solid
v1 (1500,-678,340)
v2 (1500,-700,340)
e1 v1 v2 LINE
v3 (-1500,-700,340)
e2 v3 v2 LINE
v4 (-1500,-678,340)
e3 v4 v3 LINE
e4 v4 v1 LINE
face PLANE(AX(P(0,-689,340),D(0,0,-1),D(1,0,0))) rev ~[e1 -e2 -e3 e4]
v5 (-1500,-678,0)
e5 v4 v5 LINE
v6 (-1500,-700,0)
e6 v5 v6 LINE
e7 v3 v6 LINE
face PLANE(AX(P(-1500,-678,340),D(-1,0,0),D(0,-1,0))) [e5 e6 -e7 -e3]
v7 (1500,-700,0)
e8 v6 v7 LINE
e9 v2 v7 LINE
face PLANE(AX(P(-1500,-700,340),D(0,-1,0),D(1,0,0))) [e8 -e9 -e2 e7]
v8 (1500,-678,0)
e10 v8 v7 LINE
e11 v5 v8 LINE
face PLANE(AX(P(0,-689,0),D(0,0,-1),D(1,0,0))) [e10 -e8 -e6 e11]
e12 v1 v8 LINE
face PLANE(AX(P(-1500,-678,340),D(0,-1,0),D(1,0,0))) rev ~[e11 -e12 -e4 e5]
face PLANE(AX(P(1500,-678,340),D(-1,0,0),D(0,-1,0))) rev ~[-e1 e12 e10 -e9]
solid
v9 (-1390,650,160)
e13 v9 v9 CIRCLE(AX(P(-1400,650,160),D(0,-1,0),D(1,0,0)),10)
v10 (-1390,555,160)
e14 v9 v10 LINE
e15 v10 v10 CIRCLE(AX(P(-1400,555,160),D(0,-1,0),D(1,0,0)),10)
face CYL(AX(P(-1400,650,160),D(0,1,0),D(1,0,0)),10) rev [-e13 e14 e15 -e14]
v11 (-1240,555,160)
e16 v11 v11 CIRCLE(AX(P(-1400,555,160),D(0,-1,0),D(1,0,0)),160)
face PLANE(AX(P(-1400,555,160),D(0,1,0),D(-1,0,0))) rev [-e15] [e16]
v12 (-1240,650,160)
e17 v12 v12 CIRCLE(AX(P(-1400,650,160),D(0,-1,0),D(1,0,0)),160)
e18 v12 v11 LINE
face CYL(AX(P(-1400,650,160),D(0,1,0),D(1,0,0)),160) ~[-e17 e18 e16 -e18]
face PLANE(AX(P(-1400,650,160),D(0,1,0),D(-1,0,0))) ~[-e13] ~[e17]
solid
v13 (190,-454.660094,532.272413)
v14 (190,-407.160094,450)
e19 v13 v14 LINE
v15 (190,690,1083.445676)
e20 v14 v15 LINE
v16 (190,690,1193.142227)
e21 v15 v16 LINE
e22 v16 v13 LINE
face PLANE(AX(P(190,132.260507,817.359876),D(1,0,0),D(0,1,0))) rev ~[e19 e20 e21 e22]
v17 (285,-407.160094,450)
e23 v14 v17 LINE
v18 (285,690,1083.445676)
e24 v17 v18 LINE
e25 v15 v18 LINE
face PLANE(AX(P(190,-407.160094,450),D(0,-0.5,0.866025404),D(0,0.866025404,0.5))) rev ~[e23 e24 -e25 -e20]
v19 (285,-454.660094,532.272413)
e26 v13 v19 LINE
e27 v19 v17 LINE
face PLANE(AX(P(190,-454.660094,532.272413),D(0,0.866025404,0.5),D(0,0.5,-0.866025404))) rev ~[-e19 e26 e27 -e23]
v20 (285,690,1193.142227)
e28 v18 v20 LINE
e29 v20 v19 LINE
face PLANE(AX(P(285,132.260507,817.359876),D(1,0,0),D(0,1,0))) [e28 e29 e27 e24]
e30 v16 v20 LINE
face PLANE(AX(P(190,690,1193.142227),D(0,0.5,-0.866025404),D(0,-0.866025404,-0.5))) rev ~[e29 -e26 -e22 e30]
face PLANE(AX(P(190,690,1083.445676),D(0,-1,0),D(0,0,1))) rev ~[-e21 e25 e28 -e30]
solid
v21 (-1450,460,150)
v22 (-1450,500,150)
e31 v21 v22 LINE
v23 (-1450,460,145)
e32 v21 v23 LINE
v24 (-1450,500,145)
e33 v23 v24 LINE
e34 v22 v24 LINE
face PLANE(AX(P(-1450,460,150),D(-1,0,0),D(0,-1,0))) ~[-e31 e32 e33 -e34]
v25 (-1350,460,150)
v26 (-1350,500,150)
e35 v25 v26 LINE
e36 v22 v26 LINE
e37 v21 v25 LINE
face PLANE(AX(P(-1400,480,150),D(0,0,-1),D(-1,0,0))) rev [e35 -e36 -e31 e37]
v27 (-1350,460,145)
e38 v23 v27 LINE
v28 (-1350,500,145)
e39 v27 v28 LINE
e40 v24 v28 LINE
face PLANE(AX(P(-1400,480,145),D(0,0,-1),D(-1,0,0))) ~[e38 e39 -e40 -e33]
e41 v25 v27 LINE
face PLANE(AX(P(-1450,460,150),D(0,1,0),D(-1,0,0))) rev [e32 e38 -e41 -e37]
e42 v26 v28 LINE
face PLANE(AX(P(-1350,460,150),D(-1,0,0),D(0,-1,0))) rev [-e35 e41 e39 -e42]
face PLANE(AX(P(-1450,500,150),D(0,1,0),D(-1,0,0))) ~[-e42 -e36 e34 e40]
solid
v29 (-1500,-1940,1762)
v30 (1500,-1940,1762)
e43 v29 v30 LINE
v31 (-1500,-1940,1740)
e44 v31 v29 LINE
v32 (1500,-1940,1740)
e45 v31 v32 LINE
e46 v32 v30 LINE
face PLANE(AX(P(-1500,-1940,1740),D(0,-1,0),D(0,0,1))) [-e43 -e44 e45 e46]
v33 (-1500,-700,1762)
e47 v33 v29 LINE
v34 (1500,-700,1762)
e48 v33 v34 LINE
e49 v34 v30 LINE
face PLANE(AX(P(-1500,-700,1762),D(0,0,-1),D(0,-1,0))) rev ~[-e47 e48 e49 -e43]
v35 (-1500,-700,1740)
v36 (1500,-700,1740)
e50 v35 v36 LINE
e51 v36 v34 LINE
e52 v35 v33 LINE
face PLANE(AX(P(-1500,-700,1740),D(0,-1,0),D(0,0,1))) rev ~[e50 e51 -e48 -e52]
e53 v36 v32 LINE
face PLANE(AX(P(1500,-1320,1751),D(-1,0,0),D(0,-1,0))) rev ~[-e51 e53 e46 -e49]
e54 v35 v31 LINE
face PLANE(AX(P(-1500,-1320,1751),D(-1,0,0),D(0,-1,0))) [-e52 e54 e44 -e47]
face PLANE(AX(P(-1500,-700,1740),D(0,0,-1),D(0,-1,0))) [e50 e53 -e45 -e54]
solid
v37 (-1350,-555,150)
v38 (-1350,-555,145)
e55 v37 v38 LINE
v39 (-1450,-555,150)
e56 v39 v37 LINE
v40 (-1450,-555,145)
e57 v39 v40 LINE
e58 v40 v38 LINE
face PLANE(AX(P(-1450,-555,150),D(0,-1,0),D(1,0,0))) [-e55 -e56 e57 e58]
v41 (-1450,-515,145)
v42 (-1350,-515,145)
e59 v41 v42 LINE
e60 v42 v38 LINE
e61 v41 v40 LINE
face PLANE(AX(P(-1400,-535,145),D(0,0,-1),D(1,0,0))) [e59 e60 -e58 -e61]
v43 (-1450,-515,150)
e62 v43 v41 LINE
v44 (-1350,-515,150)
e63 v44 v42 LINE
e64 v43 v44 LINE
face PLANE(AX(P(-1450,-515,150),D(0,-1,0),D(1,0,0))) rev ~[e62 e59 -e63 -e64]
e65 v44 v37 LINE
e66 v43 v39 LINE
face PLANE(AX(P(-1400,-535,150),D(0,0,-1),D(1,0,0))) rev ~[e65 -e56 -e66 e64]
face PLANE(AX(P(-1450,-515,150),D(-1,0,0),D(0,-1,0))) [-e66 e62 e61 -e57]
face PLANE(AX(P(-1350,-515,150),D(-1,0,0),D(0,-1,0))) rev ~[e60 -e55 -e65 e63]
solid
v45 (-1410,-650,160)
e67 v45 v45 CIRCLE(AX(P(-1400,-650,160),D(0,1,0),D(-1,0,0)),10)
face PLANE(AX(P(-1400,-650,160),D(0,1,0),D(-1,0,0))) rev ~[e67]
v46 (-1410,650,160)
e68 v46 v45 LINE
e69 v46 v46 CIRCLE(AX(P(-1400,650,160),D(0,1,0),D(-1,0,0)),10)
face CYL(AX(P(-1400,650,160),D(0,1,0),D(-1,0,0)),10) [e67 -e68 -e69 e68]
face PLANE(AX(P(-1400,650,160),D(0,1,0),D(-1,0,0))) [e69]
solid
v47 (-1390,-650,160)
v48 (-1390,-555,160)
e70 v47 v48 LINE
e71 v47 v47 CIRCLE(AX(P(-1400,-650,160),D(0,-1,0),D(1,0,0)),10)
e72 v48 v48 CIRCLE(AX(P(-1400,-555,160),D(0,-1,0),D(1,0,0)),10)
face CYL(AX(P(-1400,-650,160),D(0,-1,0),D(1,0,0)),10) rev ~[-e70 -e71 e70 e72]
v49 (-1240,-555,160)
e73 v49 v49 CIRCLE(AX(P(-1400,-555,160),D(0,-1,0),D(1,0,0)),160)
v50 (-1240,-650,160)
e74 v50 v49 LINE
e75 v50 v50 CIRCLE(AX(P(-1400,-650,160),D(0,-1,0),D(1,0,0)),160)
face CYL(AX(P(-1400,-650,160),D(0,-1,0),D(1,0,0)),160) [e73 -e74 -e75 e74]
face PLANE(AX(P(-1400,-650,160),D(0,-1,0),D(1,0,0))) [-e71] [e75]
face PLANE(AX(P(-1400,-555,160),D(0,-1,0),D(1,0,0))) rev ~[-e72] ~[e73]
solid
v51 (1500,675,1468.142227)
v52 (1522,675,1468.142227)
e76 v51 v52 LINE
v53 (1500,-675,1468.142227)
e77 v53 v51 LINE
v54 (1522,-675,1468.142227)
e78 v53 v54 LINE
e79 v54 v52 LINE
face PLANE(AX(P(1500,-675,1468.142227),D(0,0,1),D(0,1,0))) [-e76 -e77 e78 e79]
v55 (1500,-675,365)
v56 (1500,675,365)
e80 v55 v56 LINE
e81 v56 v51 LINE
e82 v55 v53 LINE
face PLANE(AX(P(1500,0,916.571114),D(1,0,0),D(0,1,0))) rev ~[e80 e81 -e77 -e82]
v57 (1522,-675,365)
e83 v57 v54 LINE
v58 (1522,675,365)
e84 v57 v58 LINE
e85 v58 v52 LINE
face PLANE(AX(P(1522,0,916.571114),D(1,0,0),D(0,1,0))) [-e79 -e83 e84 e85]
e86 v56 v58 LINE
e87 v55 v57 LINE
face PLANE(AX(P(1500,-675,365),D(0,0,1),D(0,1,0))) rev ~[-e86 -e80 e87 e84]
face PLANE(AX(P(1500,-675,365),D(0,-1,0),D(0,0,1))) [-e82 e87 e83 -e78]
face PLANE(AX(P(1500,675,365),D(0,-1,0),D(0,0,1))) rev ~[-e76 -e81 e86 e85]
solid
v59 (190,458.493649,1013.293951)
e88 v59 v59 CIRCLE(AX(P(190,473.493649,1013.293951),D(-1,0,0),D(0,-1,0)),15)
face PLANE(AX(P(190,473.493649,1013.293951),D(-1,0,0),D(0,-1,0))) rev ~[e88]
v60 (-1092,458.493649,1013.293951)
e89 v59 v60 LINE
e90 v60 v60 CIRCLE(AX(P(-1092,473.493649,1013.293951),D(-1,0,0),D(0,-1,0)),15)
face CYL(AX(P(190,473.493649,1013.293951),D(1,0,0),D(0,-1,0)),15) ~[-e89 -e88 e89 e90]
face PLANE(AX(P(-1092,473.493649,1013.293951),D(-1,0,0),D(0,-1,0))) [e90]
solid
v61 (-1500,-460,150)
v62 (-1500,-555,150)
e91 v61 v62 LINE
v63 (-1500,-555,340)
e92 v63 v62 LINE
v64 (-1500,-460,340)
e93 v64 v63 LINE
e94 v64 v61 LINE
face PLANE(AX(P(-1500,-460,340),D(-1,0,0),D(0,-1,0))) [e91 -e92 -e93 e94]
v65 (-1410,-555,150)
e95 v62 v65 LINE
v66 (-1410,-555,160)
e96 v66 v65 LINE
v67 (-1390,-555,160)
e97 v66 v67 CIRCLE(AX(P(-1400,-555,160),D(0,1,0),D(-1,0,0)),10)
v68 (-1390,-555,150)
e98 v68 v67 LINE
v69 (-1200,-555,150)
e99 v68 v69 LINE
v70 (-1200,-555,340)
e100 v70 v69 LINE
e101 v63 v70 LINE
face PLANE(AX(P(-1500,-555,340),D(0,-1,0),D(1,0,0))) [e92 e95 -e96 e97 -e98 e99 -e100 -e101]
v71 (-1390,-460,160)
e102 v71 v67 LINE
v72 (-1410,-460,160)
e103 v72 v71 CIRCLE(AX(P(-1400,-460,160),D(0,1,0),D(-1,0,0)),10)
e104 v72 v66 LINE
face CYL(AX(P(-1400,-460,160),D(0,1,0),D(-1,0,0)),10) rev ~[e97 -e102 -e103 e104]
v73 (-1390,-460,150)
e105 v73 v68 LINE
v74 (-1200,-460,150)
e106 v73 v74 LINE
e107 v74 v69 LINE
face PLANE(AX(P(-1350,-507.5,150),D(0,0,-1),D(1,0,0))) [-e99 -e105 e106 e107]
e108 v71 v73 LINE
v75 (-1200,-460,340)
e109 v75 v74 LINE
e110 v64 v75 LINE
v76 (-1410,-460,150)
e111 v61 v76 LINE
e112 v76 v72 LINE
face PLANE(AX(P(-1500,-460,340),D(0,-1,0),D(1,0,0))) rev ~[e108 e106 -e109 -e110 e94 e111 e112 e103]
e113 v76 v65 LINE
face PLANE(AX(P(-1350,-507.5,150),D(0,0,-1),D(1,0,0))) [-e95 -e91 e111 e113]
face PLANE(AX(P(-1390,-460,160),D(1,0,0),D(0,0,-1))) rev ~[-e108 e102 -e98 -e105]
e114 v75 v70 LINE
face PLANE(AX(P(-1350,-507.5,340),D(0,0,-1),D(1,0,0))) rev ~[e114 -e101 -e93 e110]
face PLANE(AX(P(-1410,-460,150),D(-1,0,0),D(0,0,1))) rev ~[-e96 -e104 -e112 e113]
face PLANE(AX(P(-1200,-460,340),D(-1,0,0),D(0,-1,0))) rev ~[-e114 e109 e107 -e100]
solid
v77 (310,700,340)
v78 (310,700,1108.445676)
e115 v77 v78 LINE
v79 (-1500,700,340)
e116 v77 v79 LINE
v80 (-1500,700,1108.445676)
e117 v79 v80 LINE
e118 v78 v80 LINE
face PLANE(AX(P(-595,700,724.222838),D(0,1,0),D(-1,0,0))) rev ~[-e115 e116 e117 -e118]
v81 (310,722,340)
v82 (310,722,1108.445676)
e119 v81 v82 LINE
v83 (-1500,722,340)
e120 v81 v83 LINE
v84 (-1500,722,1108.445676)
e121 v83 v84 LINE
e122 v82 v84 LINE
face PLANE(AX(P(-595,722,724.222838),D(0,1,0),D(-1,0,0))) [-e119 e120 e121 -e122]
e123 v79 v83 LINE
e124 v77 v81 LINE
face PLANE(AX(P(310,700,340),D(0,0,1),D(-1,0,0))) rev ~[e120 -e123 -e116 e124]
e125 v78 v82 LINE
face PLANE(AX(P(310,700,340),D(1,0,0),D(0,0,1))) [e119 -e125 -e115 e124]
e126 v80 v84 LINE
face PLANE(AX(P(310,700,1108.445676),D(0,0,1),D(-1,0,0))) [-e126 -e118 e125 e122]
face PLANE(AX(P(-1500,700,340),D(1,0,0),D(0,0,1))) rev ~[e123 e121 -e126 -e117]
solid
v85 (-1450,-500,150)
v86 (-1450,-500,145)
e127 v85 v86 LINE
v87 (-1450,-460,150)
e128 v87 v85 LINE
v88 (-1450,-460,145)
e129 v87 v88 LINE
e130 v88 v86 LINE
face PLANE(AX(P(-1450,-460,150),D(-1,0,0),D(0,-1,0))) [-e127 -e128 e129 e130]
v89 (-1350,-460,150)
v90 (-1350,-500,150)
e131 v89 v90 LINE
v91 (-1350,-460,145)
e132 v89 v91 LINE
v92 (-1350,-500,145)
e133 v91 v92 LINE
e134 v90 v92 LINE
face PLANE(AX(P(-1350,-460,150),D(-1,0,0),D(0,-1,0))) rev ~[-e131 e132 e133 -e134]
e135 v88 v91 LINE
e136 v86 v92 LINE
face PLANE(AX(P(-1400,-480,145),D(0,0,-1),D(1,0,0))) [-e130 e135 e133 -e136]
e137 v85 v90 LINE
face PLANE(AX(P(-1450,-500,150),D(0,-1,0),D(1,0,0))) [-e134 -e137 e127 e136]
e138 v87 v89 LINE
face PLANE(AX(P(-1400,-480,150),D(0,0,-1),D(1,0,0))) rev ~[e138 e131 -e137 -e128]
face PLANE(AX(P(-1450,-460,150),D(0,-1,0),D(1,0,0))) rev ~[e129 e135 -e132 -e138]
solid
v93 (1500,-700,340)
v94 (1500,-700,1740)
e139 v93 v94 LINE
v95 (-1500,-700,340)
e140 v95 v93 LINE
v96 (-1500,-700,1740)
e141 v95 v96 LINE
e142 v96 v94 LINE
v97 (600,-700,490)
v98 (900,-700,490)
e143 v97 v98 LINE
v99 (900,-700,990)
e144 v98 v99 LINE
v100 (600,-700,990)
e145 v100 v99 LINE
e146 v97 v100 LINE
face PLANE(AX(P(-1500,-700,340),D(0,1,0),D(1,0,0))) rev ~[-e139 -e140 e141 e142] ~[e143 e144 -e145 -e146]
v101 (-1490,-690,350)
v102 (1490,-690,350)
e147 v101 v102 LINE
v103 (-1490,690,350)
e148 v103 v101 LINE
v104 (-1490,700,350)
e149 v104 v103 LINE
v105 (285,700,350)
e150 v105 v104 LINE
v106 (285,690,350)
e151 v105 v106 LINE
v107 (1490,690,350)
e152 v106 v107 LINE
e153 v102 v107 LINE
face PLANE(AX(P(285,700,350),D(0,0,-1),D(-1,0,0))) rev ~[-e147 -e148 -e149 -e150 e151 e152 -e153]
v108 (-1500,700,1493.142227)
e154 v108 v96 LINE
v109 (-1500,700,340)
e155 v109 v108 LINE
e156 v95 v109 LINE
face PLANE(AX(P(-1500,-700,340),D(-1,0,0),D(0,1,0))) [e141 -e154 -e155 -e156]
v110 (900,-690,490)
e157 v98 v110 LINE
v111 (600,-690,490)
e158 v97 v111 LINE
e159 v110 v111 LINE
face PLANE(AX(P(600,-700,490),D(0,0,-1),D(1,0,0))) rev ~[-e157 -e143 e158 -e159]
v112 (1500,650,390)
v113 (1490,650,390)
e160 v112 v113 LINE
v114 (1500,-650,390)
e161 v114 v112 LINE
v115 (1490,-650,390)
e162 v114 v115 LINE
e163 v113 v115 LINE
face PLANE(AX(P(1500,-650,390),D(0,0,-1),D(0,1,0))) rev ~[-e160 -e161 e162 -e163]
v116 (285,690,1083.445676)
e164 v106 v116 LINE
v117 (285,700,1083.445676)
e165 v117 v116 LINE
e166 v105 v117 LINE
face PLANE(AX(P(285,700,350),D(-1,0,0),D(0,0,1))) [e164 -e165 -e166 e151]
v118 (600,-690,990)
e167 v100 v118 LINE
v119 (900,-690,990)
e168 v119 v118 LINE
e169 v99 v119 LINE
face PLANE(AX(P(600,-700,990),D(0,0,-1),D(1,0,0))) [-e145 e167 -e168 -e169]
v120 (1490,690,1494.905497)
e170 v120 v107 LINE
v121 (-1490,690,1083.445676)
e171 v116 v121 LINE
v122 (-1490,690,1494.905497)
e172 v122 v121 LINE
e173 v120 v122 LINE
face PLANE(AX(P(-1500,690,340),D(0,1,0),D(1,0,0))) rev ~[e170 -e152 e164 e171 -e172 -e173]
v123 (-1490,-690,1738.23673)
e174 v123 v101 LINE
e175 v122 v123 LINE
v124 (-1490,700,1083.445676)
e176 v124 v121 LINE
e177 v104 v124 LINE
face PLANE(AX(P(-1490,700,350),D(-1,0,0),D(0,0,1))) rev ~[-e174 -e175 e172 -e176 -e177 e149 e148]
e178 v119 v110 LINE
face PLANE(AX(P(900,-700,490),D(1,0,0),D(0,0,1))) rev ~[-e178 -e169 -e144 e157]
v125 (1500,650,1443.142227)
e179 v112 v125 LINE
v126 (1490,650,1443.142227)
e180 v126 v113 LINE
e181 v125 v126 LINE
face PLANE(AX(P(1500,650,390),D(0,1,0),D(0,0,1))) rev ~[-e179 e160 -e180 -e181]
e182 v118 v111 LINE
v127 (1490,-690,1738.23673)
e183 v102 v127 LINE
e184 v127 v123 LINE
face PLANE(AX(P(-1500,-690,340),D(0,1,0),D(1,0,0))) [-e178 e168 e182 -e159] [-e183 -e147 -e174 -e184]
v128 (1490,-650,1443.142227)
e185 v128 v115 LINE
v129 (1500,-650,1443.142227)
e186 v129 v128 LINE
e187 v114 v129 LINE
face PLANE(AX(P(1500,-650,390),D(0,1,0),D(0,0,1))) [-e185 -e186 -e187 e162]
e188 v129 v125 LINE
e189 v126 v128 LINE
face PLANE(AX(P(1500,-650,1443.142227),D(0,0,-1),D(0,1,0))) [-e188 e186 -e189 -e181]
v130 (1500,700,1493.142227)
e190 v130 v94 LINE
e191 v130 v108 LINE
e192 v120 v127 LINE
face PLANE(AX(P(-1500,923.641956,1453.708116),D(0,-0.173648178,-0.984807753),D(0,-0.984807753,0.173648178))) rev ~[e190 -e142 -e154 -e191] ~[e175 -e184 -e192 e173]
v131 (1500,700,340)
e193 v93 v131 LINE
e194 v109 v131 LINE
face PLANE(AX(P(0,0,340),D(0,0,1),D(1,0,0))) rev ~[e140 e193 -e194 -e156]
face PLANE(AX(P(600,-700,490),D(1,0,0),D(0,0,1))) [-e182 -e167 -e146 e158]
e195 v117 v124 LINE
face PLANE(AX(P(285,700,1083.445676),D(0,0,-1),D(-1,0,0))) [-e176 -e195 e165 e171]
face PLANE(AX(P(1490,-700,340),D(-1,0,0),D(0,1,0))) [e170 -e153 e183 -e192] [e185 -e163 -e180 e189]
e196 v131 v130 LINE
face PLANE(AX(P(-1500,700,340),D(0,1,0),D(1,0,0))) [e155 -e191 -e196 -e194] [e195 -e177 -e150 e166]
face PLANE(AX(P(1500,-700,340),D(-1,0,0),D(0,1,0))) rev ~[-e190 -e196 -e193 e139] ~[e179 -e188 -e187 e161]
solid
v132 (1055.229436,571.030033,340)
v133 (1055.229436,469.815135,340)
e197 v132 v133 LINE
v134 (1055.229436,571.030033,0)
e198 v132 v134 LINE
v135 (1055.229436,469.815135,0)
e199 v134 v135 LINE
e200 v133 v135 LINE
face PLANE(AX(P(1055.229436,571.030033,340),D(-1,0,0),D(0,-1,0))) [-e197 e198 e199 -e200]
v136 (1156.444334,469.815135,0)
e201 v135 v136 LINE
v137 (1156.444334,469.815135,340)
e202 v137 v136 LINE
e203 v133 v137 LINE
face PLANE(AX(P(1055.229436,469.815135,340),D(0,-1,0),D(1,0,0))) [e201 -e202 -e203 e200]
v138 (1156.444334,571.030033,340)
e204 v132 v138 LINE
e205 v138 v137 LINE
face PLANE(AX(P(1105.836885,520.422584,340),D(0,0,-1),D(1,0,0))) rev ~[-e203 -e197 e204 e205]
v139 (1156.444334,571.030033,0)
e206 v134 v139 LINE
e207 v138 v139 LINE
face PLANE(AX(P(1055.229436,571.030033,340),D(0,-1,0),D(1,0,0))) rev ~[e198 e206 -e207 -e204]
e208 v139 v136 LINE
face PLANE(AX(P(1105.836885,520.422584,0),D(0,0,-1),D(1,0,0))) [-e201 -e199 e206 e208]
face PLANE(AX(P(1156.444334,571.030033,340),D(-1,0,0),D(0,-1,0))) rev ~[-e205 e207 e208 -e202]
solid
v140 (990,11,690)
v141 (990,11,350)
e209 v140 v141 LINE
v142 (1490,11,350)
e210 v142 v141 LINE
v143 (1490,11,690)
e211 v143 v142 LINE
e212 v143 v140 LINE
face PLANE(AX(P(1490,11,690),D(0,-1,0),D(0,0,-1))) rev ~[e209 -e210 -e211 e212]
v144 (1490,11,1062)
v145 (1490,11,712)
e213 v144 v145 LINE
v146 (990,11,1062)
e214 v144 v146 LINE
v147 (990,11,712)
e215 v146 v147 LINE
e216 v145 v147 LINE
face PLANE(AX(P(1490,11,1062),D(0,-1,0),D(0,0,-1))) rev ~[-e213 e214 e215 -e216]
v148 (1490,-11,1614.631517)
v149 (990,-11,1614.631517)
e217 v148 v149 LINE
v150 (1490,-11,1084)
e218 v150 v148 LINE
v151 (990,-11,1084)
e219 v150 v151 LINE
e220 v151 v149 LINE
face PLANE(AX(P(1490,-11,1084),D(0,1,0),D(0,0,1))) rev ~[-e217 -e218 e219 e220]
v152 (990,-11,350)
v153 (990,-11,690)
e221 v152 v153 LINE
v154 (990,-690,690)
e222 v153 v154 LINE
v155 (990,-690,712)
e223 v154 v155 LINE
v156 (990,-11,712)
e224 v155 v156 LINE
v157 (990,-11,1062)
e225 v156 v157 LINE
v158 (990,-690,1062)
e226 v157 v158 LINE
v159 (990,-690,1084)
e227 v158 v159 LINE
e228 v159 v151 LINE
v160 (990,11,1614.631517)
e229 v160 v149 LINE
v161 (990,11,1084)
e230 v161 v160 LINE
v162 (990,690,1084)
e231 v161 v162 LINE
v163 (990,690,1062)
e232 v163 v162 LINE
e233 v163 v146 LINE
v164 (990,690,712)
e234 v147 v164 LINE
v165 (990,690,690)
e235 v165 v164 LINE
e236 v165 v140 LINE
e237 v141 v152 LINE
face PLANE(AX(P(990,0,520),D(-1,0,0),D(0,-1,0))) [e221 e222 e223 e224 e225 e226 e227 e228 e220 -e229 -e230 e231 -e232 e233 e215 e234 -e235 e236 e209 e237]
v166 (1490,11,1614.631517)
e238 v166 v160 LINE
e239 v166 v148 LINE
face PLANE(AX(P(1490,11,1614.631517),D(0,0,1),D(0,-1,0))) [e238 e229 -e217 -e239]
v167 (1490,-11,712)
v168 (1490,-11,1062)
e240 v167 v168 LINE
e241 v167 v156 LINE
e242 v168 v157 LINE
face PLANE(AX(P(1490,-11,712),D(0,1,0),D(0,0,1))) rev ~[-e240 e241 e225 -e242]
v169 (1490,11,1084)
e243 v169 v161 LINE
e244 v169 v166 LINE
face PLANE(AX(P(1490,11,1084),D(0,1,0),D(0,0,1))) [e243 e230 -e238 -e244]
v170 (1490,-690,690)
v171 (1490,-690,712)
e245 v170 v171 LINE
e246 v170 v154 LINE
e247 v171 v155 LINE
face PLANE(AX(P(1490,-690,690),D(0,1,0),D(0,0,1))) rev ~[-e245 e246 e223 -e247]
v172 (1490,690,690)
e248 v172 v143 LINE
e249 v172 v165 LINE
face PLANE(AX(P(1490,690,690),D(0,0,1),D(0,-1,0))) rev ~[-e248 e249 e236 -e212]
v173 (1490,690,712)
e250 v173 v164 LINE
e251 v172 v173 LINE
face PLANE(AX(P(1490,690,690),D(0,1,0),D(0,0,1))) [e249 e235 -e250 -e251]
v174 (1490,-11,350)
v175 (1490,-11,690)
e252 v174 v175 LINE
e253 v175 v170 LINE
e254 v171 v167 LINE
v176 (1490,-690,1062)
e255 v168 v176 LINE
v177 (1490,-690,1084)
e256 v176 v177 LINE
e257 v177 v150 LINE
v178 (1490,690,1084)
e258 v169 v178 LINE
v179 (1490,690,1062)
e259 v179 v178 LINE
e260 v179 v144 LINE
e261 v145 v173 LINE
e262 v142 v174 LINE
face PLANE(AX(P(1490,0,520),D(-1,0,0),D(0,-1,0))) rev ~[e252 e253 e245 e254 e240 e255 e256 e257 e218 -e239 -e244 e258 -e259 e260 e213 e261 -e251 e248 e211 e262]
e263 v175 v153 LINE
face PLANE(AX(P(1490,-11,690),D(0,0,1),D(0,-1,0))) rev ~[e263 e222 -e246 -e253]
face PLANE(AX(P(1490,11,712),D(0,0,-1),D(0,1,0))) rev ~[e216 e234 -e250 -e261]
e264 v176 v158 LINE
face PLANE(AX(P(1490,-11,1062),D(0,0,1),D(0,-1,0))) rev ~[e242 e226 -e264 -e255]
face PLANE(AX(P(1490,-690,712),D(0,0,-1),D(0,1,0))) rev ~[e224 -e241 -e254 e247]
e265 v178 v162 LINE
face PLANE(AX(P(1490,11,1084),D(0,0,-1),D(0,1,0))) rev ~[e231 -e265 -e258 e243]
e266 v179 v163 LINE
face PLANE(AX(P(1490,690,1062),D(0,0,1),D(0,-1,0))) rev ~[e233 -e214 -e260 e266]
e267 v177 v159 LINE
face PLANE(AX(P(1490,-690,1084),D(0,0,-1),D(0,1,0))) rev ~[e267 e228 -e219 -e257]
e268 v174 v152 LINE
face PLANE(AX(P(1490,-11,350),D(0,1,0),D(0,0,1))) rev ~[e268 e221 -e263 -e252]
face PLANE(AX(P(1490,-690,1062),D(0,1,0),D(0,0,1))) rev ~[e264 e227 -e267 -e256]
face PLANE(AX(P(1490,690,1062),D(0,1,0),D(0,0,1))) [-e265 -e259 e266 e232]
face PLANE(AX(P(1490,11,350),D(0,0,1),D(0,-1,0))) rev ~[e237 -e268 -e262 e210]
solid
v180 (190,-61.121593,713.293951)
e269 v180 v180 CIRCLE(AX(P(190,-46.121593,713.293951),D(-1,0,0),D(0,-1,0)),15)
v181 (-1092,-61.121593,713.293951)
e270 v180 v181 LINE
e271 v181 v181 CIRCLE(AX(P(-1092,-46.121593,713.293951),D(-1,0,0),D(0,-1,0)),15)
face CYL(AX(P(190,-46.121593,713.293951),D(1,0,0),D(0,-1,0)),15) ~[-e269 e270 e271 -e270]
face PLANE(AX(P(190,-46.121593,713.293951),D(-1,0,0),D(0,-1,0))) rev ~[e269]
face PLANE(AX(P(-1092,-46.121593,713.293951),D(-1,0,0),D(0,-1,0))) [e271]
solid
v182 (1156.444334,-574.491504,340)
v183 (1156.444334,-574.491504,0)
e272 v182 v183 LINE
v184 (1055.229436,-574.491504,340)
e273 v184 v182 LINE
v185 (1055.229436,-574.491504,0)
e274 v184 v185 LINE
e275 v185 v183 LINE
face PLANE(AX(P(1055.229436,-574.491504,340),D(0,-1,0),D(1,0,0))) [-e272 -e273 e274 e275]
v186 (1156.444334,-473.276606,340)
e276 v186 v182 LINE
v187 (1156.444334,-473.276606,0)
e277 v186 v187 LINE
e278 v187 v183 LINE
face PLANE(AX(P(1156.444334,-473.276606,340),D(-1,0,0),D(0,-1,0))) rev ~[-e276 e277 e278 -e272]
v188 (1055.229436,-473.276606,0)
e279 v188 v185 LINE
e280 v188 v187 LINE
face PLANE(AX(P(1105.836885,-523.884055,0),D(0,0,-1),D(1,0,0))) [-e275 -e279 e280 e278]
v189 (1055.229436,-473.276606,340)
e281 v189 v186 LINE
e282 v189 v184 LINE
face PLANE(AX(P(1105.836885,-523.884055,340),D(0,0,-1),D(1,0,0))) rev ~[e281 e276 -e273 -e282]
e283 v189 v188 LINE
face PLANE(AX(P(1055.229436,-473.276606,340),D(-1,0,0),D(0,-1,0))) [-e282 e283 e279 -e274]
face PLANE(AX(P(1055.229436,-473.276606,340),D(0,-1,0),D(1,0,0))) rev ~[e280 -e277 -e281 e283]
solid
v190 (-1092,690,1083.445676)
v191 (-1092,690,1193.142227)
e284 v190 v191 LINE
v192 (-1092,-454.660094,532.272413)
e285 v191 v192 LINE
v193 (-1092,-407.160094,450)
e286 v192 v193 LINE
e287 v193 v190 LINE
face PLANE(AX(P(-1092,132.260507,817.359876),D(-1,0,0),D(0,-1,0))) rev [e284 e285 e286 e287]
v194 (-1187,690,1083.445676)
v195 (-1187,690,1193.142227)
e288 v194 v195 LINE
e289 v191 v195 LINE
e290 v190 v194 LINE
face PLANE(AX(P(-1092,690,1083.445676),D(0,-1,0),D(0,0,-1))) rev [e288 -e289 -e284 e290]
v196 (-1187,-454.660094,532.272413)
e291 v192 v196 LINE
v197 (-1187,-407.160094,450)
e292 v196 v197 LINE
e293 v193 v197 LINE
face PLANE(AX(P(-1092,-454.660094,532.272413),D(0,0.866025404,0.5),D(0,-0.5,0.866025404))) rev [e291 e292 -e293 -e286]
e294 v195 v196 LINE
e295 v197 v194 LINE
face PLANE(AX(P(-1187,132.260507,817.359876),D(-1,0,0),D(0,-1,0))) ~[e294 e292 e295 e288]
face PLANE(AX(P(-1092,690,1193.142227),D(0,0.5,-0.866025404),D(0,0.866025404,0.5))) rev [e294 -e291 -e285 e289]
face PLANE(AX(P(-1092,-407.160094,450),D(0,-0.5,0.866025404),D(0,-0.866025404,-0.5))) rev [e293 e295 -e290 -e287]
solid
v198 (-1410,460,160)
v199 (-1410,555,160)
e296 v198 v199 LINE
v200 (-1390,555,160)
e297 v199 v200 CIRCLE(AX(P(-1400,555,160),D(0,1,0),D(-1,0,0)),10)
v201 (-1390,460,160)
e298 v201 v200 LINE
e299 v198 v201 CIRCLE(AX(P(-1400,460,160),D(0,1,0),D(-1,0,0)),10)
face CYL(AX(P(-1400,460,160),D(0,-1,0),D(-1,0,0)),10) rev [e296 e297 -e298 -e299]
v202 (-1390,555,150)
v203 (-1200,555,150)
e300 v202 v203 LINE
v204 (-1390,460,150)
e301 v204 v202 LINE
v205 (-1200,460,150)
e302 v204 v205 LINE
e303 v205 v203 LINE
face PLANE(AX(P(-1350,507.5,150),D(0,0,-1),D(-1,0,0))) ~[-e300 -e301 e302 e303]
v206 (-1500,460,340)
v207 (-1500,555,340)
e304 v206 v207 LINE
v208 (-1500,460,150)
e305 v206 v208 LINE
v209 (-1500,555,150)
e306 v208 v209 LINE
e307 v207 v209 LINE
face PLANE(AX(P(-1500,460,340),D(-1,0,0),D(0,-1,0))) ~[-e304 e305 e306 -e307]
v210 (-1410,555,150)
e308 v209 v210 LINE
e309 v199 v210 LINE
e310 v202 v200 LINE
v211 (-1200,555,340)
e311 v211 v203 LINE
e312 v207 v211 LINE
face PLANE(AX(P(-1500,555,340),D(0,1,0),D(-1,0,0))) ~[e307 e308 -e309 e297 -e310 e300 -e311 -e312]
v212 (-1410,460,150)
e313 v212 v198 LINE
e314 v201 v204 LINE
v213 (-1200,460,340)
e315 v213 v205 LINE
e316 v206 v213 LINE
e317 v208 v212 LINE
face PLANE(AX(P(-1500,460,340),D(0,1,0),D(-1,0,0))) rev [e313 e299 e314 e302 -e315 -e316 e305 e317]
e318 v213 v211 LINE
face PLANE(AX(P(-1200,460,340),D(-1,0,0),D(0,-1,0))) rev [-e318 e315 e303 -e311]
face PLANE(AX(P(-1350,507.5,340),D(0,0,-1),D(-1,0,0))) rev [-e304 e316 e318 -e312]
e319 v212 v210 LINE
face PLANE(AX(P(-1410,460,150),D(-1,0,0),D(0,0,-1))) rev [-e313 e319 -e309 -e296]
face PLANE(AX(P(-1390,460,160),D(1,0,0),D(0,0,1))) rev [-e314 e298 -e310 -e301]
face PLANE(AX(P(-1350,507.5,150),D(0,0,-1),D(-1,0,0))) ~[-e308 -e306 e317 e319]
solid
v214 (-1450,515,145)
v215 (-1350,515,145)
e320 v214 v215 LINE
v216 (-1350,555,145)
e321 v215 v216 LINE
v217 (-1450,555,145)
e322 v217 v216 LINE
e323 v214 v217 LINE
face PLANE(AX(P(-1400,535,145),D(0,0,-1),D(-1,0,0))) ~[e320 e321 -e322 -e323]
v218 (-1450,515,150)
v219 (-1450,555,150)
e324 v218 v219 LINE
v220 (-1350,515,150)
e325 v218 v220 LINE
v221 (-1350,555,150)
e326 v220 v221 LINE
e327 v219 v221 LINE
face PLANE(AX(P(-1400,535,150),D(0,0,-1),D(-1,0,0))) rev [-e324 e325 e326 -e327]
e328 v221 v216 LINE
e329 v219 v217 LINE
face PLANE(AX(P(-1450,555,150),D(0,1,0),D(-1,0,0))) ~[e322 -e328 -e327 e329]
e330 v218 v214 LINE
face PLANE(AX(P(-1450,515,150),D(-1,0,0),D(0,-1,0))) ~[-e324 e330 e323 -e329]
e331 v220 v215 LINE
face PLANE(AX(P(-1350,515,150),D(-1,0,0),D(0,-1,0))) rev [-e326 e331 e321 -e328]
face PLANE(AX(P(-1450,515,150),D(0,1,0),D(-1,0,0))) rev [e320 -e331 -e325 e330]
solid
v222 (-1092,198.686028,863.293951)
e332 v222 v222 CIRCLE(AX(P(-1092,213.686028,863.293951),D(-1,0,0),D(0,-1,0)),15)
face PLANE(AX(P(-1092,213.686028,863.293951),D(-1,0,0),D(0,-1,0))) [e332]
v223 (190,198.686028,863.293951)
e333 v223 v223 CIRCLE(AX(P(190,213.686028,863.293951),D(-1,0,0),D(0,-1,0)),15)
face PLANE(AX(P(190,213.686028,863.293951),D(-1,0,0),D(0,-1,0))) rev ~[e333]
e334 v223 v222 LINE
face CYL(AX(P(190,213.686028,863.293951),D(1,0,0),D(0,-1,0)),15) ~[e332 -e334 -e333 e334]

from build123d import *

# Parameters (mm, degrees)
F5_W      = 3000
F5_H      = 1400
F6_DEPTH  = 1400
F7_T      = -10
F10_DEPTH = 3000.001
F11_W     = 22
F11_H     = 340
F11_H_2   = 22
F11_W_2   = 679
F11_H_3   = 350
F11_H_4   = 530.6315167163
F12_DEPTH = 500
F13_W     = 1300
F13_H     = 1053.1422270081
F14_DEPTH = 25
F15_W     = 1350
F15_H     = 1103.1422270081
F16_DEPTH = 22
F19_DEPTH = 95
F21_R     = 15
F22_DEPTH = 1282
F23_W     = 300
F23_H     = 500
F24_DEPTH = 25
F25_W     = 1240
F25_H     = 22
F26_DEPTH = 3000
F27_W     = 1775
F27_H     = 733.4456758621
F28_DEPTH = 25
F29_W     = 1810
F29_H     = 768.4456758621
F30_DEPTH = 22
F31_W     = 3000
F31_H     = 22
F32_DEPTH = 340
F33_W     = 101.2148975914
F33_H     = 101.2148975914
F34_DEPTH = 340
F36_R     = 160
F36_R_2   = 10
F37_DEPTH = 95
F38_W     = 300
F38_H     = 95
F39_DEPTH = 190
F41_DEPTH = 1480.001
F42_W     = 100
F42_H     = 40
F43_DEPTH = 5
F45_R     = 10
F46_DEPTH = 1300


# Not quite as in the source:
# - a feature of the source that left no trace in its solid (it failed there, or was rolled back) is left out
# - a pattern or mirror of a feature is missing from the dataset's text; its kind, count and spacing are read off the source's solid


with BuildPart() as f6:
    # F5 (on offset) → F6 (new body)
    with BuildSketch(Plane.XY.offset(340)):
        Rectangle(F5_W, F5_H)
    extrude(amount=F6_DEPTH)

    # F7
    f7_openings = [f6.faces().sort_by_distance(p)[0] for p in [
        (0, 0, 1740),
    ]]
    offset(amount=F7_T, openings=f7_openings)

    # F9 (on face) → F10 (cut, through all)
    with BuildSketch(Plane(origin=(-1500, 0, 0), x_dir=(0, -1, 0), z_dir=(-1, 0, 0))):
        Polygon((-923.6419556025, 1453.708116217), (851.2289943782, 1766.6657519743), (692.6008882609, 2226.9985032484), (-1018.4111959435, 1991.1711860221), align=None)
    extrude(amount=-F10_DEPTH, mode=Mode.SUBTRACT)

    # F13 (on face) → F14 (cut)
    with BuildSketch(Plane.YZ.offset(1500)):
        with Locations((0, 916.5711135041)):
            Rectangle(F13_W, F13_H)
    extrude(amount=-F14_DEPTH, mode=Mode.SUBTRACT)

    # F23 (on face) → F24 (cut)
    with BuildSketch(Plane.XZ.offset(700)):
        with Locations((750, 740)):
            Rectangle(F23_W, F23_H)
    extrude(amount=-F24_DEPTH, mode=Mode.SUBTRACT)

    # F27 (on face) → F28 (cut)
    with BuildSketch(Plane(origin=(0, 700, 0), x_dir=(-1, 0, 0), z_dir=(0, 1, 0))):
        with Locations((602.5, 716.7228379311)):
            Rectangle(F27_W, F27_H)
    extrude(amount=-F28_DEPTH, mode=Mode.SUBTRACT)


with BuildPart() as f12:
    # F11 (on face) → F12 (new body)
    with BuildSketch(Plane(origin=(1490, 0, 0), x_dir=(0, -1, 0), z_dir=(-1, 0, 0))):
        with Locations((0, 520)):
            Rectangle(F11_W, F11_H)
        with Locations((0, 701)):
            Rectangle(F11_W, F11_H_2)
        with Locations((350.5, 701)):
            Rectangle(F11_W_2, F11_H_2)
        with Locations((-350.5, 701)):
            Rectangle(F11_W_2, F11_H_2)
        with Locations((0, 887)):
            Rectangle(F11_W, F11_H_3)
        with Locations((0, 1073)):
            Rectangle(F11_W, F11_H_2)
        with Locations((350.5, 1073)):
            Rectangle(F11_W_2, F11_H_2)
        with Locations((-350.5, 1073)):
            Rectangle(F11_W_2, F11_H_2)
        with Locations((0, 1349.3157583581)):
            Rectangle(F11_W, F11_H_4)
    extrude(amount=F12_DEPTH)


with BuildPart() as f16:
    # F15 (on face) → F16 (new body)
    with BuildSketch(Plane.YZ.offset(1500)):
        with Locations((0, 916.5711135041)):
            Rectangle(F15_W, F15_H)
    extrude(amount=F16_DEPTH)


with BuildPart() as f19:
    # F18 (on offset) → F19 (new body)
    with BuildSketch(Plane.YZ.offset(190)):
        Polygon((690, 1083.4456758621), (690, 1193.1422270081), (-454.660094428, 532.2724133595), (-407.160094428, 450), align=None)
    extrude(amount=F19_DEPTH)


with BuildPart() as f19_copies_1:
    # F19_copies: instance of F19
    add(f19.part.mirror(Plane(origin=(-451, 0, 0), x_dir=(0, 0, -1), z_dir=(-1, 0, 0))))


with BuildPart() as f22:
    # F21 (on face) → F22 (new body, through all)
    with BuildSketch(Plane(origin=(190, 0, 0), x_dir=(0, -1, 0), z_dir=(-1, 0, 0))):
        with Locations((-473.4936490539, 1013.2939514351)):
            Circle(F21_R)
    extrude(amount=F22_DEPTH)


with BuildPart() as f22b:
    # F21 (on face) → F22, piece 2 (new body, through all)
    with BuildSketch(Plane(origin=(190, 0, 0), x_dir=(0, -1, 0), z_dir=(-1, 0, 0))):
        with Locations((-213.6860279186, 863.2939514351)):
            Circle(F21_R)
    extrude(amount=F22_DEPTH)


with BuildPart() as f22c:
    # F21 (on face) → F22, piece 3 (new body, through all)
    with BuildSketch(Plane(origin=(190, 0, 0), x_dir=(0, -1, 0), z_dir=(-1, 0, 0))):
        with Locations((46.1215932168, 713.2939514351)):
            Circle(F21_R)
    extrude(amount=F22_DEPTH)


with BuildPart() as f26:
    # F25 (on face) → F26 (new body, through all)
    with BuildSketch(Plane(origin=(-1500, 0, 0), x_dir=(0, -1, 0), z_dir=(-1, 0, 0))):
        with Locations((1320, 1751)):
            Rectangle(F25_W, F25_H)
    extrude(amount=-F26_DEPTH)


with BuildPart() as f30:
    # F29 (on face) → F30 (new body)
    with BuildSketch(Plane(origin=(0, 700, 0), x_dir=(-1, 0, 0), z_dir=(0, 1, 0))):
        with Locations((595, 724.2228379311)):
            Rectangle(F29_W, F29_H)
    extrude(amount=F30_DEPTH)


with BuildPart() as f32:
    # F31 (on face) → F32 (new body)
    with BuildSketch(Plane(origin=(0, 0, 340), x_dir=(1, 0, 0), z_dir=(0, 0, -1))):
        with Locations((0, 689)):
            Rectangle(F31_W, F31_H)
    extrude(amount=F32_DEPTH)


with BuildPart() as f34:
    # F33 (on face) → F34 (new body)
    with BuildSketch(Plane(origin=(0, 0, 340), x_dir=(1, 0, 0), z_dir=(0, 0, -1))):
        with Locations((1105.8368849942, 523.8840551683)):
            Rectangle(F33_W, F33_H)
    extrude(amount=F34_DEPTH)


with BuildPart() as f34b:
    # F33 (on face) → F34, piece 2 (new body)
    with BuildSketch(Plane(origin=(0, 0, 340), x_dir=(1, 0, 0), z_dir=(0, 0, -1))):
        with Locations((1105.8368849942, -520.4225837978)):
            Rectangle(F33_W, F33_H)
    extrude(amount=F34_DEPTH)


with BuildPart() as f37:
    # F36 (on offset) → F37 (new body)
    with BuildSketch(Plane.XZ.offset(650)):
        with Locations((-1400, 160)):
            Circle(F36_R)
        with Locations((-1400, 160)):
            Circle(F36_R_2, mode=Mode.SUBTRACT)
    extrude(amount=-F37_DEPTH)


with BuildPart() as f39:
    # F38 (on face) → F39 (new body)
    with BuildSketch(Plane(origin=(0, 0, 340), x_dir=(1, 0, 0), z_dir=(0, 0, -1))):
        with Locations((-1350, 507.5)):
            Rectangle(F38_W, F38_H)
    extrude(amount=F39_DEPTH)

    # F40 (on face) → F41 (cut, through all)
    with BuildSketch(Plane(origin=(0, -460, 0), x_dir=(-1, 0, 0), z_dir=(0, 1, 0))):
        with BuildLine():
            Line((1410, 150), (1410, 160))
            ThreePointArc((1410, 160), (1400, 170), (1390, 160))
            Line((1390, 160), (1390, 150))
            Line((1390, 150), (1410, 150))
        make_face()
    extrude(amount=-F41_DEPTH, mode=Mode.SUBTRACT)


with BuildPart() as f43:
    # F42 (on face) → F43 (new body)
    with BuildSketch(Plane(origin=(0, 0, 150), x_dir=(1, 0, 0), z_dir=(0, 0, -1))):
        with Locations((-1400, 480)):
            Rectangle(F42_W, F42_H)
    extrude(amount=F43_DEPTH)


with BuildPart() as f43b:
    # F42 (on face) → F43, piece 2 (new body)
    with BuildSketch(Plane(origin=(0, 0, 150), x_dir=(1, 0, 0), z_dir=(0, 0, -1))):
        with Locations((-1400, 535)):
            Rectangle(F42_W, F42_H)
    extrude(amount=F43_DEPTH)


with BuildPart() as f44_1:
    # F44: instance of F37
    add(f37.part.mirror(Plane.XZ))


with BuildPart() as f44_2:
    # F44: instance of F39
    add(f39.part.mirror(Plane.XZ))


with BuildPart() as f44_3:
    # F44: instance of F43b
    add(f43b.part.mirror(Plane.XZ))


with BuildPart() as f44_4:
    # F44: instance of F43
    add(f43.part.mirror(Plane.XZ))


with BuildPart() as f46:
    # F45 (on face) → F46 (new body, through all)
    with BuildSketch(Plane(origin=(0, 650, 0), x_dir=(-1, 0, 0), z_dir=(0, 1, 0))):
        with Locations((1400, 160)):
            Circle(F45_R)
    extrude(amount=-F46_DEPTH)


solid = Compound([f6.part, f12.part, f16.part, f19.part, f19_copies_1.part, f22.part, f22b.part, f22c.part, f26.part, f30.part, f32.part, f34.part, f34b.part, f37.part, f39.part, f43.part, f43b.part, f44_1.part, f44_2.part, f44_3.part, f44_4.part, f46.part])
